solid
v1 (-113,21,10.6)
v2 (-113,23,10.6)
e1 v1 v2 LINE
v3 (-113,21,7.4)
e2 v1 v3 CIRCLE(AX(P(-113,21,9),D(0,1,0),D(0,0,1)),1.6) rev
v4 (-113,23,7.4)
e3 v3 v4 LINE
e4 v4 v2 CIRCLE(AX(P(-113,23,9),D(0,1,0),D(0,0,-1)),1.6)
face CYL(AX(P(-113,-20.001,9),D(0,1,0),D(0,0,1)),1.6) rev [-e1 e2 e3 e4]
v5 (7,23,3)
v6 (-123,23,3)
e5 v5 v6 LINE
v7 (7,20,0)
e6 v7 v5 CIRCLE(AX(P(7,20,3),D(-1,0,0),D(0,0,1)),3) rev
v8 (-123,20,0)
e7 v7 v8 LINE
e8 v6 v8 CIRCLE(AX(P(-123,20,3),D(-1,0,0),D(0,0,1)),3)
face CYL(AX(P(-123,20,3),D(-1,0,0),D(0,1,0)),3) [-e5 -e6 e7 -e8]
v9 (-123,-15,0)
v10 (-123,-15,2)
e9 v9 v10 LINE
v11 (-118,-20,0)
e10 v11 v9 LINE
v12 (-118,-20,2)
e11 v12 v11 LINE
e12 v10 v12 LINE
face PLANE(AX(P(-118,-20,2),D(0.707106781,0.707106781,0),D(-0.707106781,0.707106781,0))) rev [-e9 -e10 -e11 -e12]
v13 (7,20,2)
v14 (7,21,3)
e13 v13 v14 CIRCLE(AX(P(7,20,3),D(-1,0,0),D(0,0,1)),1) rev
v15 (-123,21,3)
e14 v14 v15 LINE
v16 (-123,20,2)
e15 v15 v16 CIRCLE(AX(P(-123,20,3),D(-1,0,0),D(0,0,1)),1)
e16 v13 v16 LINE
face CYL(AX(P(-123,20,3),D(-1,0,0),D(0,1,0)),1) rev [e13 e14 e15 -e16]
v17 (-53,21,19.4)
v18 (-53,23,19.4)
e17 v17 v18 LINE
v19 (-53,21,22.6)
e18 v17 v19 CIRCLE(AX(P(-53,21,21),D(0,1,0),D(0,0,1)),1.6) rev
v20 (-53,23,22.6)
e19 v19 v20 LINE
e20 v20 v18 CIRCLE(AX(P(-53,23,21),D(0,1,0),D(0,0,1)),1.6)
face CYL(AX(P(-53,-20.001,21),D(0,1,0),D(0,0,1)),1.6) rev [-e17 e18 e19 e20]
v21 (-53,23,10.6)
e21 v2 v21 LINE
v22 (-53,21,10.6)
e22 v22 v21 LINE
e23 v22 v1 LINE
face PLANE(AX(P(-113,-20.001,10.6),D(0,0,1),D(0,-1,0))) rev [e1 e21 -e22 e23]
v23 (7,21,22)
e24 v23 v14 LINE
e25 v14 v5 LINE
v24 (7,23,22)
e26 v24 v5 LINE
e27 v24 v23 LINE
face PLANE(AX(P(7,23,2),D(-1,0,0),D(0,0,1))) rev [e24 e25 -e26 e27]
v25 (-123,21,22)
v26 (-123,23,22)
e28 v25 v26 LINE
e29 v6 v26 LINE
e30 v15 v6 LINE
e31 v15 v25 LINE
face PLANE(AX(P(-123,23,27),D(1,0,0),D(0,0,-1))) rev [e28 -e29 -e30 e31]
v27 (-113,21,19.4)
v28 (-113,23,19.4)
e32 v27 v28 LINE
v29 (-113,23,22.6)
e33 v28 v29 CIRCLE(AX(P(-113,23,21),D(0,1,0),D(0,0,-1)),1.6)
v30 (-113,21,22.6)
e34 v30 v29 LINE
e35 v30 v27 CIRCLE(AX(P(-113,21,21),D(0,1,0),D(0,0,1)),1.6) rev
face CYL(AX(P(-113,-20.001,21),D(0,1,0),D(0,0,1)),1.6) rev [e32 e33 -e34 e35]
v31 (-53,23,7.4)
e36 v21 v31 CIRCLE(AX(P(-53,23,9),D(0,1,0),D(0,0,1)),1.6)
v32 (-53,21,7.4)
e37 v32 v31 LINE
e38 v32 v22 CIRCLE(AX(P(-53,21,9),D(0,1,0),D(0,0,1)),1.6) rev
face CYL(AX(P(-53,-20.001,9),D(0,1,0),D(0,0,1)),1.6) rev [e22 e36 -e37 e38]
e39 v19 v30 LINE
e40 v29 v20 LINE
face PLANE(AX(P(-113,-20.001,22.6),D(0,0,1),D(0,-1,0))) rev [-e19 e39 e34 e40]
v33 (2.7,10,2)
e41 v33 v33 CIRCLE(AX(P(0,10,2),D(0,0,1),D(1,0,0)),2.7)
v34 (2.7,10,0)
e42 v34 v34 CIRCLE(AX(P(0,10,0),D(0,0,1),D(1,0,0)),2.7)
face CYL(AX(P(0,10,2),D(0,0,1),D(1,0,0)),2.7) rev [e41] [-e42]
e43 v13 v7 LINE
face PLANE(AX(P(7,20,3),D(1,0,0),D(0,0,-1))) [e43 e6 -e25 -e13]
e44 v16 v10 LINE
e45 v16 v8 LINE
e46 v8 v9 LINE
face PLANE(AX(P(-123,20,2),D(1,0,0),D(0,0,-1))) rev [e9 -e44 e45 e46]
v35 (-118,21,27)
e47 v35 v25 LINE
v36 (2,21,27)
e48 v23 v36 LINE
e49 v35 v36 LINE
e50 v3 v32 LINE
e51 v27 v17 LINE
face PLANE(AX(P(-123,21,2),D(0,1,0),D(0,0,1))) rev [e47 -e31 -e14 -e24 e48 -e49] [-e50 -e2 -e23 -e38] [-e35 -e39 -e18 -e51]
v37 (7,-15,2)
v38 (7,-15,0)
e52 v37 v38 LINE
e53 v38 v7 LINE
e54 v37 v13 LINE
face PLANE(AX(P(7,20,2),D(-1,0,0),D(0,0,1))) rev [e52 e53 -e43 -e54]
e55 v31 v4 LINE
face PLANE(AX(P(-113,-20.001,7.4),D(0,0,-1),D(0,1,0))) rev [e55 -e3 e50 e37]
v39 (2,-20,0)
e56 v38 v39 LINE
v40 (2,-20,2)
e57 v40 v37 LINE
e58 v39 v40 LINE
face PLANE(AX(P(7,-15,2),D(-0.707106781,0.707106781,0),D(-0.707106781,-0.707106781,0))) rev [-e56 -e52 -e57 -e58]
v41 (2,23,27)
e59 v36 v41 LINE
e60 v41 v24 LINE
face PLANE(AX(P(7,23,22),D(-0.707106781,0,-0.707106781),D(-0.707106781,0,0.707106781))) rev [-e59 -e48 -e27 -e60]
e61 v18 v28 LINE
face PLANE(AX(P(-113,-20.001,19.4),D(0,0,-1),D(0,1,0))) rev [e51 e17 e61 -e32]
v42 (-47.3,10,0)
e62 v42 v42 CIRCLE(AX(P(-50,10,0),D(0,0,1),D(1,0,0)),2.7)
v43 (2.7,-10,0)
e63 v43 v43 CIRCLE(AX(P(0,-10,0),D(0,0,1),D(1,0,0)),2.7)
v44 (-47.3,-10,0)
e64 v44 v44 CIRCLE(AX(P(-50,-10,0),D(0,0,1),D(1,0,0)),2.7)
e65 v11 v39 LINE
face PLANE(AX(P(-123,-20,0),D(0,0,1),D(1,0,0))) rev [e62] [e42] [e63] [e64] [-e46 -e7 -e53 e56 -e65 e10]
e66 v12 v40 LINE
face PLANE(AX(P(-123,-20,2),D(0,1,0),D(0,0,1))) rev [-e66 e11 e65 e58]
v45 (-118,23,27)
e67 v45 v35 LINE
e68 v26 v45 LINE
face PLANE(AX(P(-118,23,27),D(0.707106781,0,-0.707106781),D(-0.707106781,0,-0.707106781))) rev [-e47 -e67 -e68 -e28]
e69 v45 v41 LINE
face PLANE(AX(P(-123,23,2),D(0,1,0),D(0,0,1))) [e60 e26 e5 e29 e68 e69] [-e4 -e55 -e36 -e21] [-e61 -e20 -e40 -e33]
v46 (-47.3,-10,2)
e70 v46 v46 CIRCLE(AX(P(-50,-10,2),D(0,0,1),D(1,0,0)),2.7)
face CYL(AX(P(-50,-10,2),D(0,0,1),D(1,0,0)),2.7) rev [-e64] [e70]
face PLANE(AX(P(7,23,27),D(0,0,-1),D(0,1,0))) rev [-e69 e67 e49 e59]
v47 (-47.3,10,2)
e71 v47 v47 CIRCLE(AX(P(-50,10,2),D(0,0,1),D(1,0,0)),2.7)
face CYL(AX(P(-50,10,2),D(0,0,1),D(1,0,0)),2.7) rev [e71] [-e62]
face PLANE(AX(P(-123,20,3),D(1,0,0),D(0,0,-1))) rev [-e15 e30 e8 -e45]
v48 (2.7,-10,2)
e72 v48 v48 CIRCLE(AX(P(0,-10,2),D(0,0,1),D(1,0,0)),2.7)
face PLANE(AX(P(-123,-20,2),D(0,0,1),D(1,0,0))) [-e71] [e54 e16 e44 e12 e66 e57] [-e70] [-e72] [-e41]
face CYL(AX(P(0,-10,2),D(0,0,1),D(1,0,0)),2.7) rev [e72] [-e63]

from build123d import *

# Parameters (mm, degrees)
SKETCH_17_W             = 130
SKETCH_17_H             = 40
SM_BASE_FLANGE_1_DEPTH  = 2
HOLE_WIZARD_5_4_5_4_1_D = 5.4
SM_EDGE_FLANGE_1_DEPTH  = 130
CUT_EXTRUDE_4_REACH     = 135.822
CHAMFER_1_SIZE          = 5


# Sheet-metal steps are written as plain solids
with BuildPart() as part:
    # 草圖17 → 基材-凸緣1 (new body)
    with BuildSketch(Plane.XY):
        with Locations((-58, 0)):
            Rectangle(SKETCH_17_W, SKETCH_17_H)
    extrude(amount=SM_BASE_FLANGE_1_DEPTH)

    # Ø5.4 (5.4) 直徑孔1 (through all)
    with Locations(Plane(origin=(-278.067262353, 19.151419807, 2), x_dir=(-1, 0, 0), z_dir=(0, 0, 1))):
        with Locations((-228.067262353, 29.151419807), (-278.067262353, 29.151419807), (-228.067262353, 9.151419807), (-278.067262353, 9.151419807)):
            Hole(HOLE_WIZARD_5_4_5_4_1_D / 2)

    # 邊線-凸緣1 section (across the edge) → 邊線-凸緣1 (add)
    with BuildSketch(Plane(origin=(7, 21, 2), x_dir=(0, -1, 0), z_dir=(-1, 0, 0))):
        with BuildLine():
            Line((-2, 1), (-2, 25))
            Line((-2, 25), (0, 25))
            Line((0, 25), (0, 1))
            ThreePointArc((0, 1), (0.292893219, 0.292893219), (1, 0))
            Line((1, 0), (1, -2))
            ThreePointArc((1, -2), (-1.121320344, -1.121320344), (-2, 1))
        make_face()
    extrude(amount=SM_EDGE_FLANGE_1_DEPTH)

    # 草圖14 → 除料-伸長4 (cut, up to next)
    with BuildSketch(Plane(origin=(0, 23, 30.5), x_dir=(1, 0, 0), z_dir=(0, 1, 0)), mode=Mode.PRIVATE) as cut_extrude_4_sk1:
        with BuildLine():
            Line((-113, 19.9), (-53, 19.9))
            ThreePointArc((-53, 19.9), (-51.4, 21.5), (-53, 23.1))
            Line((-53, 23.1), (-113, 23.1))
            ThreePointArc((-113, 23.1), (-114.6, 21.5), (-113, 19.9))
        make_face()
    cut_extrude_4_tool1 = extrude(cut_extrude_4_sk1.sketch, amount=-CUT_EXTRUDE_4_REACH, mode=Mode.PRIVATE) & part.part
    # 草圖14 → 除料-伸長4 (cut, up to next)
    with BuildSketch(Plane(origin=(0, 23, 30.5), x_dir=(1, 0, 0), z_dir=(0, 1, 0)), mode=Mode.PRIVATE) as cut_extrude_4_sk2:
        with BuildLine():
            Line((-113, 7.9), (-53, 7.9))
            ThreePointArc((-53, 7.9), (-51.4, 9.5), (-53, 11.1))
            Line((-53, 11.1), (-113, 11.1))
            ThreePointArc((-113, 11.1), (-114.6, 9.5), (-113, 7.9))
        make_face()
    cut_extrude_4_tool2 = extrude(cut_extrude_4_sk2.sketch, amount=-CUT_EXTRUDE_4_REACH, mode=Mode.PRIVATE) & part.part
    add(cut_extrude_4_tool1.solids().sort_by_distance((-83, 23, 9))[0], mode=Mode.SUBTRACT)
    add(cut_extrude_4_tool2.solids().sort_by_distance((-83, 23, 21))[0], mode=Mode.SUBTRACT)

    # 導角1
    chamfer_1_edges = [part.edges().sort_by_distance(p)[0] for p in [
        (7, 22, 27),
        (-123, 22, 27),
        (7, -20, 1),
        (-123, -20, 1),
    ]]
    chamfer(chamfer_1_edges, length=CHAMFER_1_SIZE)


solid = part.part
